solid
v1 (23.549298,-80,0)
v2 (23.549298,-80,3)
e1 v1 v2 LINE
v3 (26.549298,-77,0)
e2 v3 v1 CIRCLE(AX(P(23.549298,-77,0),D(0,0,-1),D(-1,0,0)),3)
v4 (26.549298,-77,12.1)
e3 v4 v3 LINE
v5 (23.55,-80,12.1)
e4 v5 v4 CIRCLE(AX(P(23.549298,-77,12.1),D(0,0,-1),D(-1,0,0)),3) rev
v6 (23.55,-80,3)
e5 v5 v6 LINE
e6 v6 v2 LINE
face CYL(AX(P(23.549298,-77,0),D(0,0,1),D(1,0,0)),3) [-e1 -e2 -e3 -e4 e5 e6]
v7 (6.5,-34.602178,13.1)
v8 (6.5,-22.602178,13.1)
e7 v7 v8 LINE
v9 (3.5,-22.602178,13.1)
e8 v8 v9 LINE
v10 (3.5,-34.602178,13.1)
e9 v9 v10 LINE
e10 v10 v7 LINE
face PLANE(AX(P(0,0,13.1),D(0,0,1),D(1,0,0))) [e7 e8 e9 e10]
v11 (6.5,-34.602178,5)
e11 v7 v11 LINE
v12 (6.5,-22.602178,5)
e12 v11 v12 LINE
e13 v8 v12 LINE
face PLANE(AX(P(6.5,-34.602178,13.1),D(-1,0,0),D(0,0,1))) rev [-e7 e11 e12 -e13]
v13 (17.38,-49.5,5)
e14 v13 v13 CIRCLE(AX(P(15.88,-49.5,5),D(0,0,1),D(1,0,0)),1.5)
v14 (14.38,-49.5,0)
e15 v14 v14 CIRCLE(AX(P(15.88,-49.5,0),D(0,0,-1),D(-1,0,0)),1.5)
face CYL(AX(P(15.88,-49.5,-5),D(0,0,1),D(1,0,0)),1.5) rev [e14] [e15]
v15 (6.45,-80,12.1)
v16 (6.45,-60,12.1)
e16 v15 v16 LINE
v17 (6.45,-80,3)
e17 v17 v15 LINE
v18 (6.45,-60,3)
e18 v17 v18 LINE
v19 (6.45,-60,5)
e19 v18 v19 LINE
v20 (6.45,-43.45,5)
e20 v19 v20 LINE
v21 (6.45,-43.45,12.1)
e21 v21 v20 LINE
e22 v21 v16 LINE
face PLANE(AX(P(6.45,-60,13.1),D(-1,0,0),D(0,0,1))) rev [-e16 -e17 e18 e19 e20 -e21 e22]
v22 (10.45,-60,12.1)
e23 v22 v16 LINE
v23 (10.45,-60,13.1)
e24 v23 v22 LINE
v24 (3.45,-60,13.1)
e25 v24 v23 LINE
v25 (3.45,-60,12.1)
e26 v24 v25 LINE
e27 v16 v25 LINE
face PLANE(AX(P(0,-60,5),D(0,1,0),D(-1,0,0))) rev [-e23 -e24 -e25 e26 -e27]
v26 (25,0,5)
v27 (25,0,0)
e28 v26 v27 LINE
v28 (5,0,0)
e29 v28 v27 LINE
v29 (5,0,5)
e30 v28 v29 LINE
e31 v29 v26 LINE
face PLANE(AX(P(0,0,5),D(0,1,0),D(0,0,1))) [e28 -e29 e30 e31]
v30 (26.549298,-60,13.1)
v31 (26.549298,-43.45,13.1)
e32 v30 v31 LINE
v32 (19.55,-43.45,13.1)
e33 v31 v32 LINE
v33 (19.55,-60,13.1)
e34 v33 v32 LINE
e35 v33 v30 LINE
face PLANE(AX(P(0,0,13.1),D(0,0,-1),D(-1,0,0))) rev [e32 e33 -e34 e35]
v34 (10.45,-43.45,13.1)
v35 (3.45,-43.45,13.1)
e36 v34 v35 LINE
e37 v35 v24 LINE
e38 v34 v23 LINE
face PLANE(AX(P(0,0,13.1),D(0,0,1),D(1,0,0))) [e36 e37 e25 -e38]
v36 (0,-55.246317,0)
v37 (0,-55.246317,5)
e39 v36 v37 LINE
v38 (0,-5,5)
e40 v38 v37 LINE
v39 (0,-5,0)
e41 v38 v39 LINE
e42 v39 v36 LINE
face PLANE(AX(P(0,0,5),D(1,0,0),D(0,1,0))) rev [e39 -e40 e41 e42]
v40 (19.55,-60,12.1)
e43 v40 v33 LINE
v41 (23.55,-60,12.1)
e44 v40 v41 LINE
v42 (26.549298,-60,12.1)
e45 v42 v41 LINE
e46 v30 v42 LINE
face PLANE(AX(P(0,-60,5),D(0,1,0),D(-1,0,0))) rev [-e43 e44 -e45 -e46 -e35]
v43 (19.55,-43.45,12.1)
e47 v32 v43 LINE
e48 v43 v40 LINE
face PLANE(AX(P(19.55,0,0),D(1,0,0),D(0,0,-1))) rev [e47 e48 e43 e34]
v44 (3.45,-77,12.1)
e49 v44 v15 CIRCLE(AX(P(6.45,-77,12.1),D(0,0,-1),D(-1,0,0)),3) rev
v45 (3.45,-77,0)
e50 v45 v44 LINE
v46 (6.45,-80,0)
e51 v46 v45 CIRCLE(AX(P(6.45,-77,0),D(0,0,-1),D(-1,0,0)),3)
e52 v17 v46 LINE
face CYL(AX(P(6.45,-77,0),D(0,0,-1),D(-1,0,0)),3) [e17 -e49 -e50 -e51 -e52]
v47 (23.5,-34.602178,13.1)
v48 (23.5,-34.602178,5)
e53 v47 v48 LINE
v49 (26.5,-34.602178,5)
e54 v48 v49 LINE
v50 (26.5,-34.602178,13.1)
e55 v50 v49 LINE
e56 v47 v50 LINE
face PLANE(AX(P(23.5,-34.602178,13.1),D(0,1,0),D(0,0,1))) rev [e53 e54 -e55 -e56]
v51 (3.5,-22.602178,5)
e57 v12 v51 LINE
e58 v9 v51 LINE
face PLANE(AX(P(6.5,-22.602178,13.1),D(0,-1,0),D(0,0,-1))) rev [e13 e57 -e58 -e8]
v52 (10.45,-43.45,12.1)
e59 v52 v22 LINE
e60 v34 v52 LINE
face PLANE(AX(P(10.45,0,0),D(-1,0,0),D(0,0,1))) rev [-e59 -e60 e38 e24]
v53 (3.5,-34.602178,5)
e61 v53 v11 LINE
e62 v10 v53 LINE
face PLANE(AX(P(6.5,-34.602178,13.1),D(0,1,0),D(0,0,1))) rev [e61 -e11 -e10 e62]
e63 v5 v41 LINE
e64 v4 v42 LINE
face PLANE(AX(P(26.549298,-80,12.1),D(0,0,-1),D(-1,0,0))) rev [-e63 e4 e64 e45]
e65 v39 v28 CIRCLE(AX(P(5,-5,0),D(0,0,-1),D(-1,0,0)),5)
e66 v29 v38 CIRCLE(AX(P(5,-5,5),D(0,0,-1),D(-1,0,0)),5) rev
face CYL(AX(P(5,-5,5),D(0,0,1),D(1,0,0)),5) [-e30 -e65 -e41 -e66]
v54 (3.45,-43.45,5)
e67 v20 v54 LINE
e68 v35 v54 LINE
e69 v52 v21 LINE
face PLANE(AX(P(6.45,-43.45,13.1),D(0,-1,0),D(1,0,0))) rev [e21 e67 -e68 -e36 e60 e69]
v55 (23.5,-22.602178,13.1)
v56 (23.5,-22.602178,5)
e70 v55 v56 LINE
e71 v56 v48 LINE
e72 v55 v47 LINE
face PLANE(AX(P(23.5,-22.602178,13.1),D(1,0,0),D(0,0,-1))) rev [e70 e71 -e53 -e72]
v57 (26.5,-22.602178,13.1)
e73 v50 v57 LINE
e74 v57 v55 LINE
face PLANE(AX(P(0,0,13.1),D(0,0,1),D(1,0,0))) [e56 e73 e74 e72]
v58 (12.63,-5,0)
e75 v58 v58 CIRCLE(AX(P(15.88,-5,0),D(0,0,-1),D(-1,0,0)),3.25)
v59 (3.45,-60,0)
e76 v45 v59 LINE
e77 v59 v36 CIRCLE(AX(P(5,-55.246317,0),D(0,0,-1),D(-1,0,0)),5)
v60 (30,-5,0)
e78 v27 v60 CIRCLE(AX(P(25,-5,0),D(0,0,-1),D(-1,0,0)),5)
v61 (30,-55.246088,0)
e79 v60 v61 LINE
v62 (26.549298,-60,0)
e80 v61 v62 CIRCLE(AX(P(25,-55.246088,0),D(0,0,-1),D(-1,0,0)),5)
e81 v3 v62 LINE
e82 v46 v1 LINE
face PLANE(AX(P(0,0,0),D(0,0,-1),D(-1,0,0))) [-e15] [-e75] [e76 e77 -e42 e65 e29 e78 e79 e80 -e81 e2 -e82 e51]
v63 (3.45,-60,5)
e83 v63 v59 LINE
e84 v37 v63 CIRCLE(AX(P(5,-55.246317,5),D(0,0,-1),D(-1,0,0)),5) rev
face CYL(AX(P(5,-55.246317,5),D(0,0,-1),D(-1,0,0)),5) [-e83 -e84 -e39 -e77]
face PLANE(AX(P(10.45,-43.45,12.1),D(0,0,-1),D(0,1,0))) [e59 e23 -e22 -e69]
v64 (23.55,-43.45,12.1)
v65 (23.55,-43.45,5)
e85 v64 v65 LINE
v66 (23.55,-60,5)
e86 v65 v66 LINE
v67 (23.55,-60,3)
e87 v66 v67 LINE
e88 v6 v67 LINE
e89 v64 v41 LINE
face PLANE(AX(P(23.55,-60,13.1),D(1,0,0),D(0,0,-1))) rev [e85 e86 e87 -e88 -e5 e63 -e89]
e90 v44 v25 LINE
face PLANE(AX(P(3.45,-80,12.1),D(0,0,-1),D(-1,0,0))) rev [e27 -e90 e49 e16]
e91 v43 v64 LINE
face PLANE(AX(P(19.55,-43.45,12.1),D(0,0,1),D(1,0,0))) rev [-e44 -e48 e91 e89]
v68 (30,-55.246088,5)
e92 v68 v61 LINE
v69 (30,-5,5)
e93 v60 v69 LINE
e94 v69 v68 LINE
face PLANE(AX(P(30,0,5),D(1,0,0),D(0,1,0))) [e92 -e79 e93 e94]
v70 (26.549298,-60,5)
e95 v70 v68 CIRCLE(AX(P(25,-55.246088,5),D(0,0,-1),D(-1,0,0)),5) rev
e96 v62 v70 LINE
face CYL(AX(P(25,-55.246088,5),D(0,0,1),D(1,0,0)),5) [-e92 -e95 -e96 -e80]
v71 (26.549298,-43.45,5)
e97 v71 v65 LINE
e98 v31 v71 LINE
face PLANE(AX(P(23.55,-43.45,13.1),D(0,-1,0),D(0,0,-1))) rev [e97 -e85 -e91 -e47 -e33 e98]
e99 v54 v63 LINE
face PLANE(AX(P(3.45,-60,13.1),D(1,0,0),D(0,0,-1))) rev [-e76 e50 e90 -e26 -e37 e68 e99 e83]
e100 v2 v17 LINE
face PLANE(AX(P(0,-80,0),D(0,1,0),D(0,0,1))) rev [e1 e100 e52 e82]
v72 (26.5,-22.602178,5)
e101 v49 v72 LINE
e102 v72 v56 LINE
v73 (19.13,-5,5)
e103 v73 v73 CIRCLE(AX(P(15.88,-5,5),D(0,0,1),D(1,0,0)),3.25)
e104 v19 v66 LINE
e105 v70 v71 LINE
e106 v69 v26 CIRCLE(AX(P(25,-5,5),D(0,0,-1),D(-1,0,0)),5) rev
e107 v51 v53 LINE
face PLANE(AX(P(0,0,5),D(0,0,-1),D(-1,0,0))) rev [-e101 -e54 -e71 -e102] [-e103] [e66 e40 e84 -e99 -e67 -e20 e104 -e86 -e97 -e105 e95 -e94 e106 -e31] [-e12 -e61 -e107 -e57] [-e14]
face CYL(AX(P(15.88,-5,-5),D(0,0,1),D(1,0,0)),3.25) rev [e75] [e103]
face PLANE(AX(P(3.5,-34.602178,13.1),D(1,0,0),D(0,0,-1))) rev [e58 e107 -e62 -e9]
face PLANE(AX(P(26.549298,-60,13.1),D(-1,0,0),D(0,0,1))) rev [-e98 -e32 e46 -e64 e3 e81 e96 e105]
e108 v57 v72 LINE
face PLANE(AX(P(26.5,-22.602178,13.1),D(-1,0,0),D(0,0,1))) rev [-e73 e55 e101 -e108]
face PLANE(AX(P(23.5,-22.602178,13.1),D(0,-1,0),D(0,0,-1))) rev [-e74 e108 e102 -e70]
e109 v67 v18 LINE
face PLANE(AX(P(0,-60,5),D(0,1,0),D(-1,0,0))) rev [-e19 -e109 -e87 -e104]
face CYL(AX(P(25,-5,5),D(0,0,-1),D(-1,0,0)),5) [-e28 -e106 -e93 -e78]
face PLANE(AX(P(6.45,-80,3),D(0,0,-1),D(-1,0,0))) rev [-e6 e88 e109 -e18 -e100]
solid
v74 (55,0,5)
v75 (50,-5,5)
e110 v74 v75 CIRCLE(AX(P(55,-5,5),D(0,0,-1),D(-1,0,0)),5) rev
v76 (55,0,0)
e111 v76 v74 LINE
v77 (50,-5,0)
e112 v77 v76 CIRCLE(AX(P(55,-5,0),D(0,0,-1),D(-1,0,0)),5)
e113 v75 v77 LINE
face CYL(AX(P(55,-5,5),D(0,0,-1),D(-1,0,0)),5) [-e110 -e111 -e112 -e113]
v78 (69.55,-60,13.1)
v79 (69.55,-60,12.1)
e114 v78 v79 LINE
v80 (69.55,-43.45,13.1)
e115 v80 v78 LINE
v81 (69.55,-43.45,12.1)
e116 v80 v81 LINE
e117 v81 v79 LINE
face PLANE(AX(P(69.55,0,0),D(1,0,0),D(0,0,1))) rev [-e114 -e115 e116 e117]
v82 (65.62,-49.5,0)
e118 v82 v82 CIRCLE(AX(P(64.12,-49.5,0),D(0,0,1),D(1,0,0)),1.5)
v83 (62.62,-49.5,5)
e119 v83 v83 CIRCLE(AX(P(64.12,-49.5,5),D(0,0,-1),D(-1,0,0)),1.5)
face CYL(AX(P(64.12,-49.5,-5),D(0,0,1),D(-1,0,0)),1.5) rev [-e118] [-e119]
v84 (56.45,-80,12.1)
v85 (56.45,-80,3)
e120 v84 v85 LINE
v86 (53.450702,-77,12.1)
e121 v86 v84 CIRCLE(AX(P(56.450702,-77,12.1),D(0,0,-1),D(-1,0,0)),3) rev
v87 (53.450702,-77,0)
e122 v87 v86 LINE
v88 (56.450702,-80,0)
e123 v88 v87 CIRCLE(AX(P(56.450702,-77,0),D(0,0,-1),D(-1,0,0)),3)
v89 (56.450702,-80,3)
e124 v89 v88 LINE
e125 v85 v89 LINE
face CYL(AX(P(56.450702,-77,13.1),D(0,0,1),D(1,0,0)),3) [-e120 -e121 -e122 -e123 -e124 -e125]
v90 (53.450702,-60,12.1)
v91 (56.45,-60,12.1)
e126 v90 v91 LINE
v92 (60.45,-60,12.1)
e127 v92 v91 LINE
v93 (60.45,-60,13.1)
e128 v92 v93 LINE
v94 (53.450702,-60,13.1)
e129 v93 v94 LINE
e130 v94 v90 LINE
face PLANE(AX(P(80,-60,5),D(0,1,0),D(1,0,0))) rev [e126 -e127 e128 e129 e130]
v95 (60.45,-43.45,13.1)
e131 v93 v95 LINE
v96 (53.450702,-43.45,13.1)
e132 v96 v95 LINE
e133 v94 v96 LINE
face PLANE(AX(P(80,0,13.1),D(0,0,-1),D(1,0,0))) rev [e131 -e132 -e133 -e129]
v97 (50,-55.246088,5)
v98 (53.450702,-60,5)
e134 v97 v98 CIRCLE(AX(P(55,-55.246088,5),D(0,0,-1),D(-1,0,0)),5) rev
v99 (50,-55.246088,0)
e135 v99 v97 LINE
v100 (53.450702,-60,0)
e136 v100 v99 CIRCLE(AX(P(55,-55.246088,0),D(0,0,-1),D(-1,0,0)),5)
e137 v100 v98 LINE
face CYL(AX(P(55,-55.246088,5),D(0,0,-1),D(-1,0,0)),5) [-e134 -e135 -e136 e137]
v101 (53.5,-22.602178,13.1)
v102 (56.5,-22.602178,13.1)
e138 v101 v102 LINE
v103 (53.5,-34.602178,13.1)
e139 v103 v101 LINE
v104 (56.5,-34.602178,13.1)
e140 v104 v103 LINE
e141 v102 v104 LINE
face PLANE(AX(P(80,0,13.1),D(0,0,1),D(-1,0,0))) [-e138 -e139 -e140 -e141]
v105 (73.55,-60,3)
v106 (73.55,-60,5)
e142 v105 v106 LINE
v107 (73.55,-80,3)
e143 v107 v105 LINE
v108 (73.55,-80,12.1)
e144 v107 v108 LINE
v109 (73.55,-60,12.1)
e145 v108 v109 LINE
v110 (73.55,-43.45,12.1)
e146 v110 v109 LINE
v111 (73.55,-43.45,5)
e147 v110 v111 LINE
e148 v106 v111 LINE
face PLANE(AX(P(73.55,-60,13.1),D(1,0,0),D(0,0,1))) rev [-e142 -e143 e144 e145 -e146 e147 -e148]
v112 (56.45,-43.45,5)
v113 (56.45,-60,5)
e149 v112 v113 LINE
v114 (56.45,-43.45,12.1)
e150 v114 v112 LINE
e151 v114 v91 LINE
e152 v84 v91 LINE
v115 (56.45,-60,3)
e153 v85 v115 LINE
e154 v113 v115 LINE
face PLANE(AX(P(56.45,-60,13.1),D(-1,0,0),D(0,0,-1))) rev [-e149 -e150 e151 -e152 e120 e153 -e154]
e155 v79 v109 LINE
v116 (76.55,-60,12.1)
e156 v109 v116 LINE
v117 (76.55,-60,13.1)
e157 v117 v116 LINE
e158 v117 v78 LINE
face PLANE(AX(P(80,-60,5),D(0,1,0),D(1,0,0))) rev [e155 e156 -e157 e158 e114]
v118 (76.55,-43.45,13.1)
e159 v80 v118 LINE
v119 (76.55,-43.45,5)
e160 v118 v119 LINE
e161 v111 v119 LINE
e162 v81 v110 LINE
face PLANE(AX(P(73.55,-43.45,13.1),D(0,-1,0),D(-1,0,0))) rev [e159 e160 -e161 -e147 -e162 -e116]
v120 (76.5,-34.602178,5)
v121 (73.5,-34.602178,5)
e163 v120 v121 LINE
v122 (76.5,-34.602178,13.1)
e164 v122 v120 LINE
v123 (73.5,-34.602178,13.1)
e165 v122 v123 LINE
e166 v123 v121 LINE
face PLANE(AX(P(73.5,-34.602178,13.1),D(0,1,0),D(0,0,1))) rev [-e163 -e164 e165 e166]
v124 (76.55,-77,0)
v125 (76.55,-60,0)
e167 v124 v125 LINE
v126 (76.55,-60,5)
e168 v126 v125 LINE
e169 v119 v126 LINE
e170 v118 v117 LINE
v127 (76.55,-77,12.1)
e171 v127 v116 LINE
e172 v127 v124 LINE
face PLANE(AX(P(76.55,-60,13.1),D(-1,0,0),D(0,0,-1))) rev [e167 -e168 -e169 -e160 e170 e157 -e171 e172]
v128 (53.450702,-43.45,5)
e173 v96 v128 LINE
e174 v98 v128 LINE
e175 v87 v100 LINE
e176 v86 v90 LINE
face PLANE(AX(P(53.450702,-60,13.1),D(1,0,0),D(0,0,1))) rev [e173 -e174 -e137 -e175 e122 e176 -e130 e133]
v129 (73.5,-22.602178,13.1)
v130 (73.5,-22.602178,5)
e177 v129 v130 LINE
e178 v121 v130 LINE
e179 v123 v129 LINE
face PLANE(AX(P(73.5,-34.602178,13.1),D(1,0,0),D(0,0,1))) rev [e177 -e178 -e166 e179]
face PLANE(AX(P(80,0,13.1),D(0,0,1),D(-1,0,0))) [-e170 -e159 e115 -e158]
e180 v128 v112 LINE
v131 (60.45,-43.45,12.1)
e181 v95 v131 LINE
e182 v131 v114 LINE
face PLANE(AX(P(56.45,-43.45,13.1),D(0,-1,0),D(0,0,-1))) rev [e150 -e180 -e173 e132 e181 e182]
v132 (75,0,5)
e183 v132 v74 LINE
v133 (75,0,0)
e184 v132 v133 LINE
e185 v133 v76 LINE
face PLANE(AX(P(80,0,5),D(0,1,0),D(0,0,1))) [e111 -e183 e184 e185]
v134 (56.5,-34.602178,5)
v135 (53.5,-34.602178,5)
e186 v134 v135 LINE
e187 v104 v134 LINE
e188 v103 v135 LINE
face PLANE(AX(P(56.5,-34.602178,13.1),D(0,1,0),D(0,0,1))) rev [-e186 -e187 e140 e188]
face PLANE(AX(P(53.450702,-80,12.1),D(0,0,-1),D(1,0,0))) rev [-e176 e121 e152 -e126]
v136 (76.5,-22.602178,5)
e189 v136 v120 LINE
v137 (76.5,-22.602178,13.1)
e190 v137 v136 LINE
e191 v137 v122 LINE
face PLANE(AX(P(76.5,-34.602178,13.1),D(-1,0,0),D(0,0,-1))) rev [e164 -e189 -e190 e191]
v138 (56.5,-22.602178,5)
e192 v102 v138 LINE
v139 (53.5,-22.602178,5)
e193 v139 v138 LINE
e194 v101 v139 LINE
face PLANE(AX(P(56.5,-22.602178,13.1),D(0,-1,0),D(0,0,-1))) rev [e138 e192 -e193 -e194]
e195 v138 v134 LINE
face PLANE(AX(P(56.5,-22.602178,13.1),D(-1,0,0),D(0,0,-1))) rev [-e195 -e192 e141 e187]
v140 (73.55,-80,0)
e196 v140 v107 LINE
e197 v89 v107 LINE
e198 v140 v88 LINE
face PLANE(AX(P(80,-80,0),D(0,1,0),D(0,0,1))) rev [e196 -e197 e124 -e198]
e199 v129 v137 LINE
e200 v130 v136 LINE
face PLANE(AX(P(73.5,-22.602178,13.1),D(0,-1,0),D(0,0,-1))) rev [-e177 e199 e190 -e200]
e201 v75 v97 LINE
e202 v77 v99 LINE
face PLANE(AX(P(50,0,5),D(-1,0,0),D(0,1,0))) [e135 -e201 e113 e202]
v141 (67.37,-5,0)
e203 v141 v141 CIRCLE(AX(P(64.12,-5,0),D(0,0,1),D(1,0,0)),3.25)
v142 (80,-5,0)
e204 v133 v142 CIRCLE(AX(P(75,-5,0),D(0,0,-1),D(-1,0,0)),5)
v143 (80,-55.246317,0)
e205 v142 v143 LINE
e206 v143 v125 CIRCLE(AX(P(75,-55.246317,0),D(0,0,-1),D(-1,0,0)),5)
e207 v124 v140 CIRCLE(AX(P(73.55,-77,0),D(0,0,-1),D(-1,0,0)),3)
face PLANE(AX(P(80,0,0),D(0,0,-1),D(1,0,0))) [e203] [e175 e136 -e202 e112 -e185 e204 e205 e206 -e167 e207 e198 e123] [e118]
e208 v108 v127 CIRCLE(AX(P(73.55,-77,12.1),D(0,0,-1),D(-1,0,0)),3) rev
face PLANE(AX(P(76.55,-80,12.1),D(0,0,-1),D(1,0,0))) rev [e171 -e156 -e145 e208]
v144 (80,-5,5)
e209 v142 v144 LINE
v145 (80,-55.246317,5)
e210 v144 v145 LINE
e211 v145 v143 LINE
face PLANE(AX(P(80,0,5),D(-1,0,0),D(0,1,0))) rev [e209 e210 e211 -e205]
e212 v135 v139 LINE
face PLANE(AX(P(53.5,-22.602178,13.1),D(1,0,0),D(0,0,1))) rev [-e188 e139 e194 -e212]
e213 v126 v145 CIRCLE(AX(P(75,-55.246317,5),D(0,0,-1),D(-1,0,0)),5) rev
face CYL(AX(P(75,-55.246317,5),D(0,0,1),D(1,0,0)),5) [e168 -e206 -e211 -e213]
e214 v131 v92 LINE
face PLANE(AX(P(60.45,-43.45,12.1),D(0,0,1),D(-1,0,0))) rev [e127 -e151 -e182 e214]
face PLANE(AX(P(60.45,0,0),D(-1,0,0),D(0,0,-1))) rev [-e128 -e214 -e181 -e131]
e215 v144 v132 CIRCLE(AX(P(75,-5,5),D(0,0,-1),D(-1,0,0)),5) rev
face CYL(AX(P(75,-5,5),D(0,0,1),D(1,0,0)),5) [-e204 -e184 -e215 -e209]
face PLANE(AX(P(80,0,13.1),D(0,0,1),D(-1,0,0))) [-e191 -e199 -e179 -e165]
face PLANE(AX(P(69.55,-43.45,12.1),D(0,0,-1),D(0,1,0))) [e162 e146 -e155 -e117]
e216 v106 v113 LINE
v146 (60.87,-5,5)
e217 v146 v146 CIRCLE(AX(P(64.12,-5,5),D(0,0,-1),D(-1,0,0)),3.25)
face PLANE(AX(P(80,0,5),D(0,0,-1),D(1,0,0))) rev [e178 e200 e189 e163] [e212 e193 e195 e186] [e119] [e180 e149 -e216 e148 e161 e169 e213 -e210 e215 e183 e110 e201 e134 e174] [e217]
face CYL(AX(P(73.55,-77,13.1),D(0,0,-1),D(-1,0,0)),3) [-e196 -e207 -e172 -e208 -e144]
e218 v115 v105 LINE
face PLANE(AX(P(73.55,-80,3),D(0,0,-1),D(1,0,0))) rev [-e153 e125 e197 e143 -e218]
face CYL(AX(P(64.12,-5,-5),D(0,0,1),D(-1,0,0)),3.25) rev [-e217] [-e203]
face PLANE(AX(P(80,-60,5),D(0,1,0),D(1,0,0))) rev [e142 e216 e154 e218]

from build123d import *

# Parameters (mm, degrees)
SKETCH_1_W          = 30
SKETCH_1_H          = 60
EXTRUDE_1_DEPTH     = 5
SKETCH_2_R          = 3.25
SKETCH_2_R_2        = 1.5
CUT_EXTRUDE_1_DEPTH = 10
SKETCH_3_W          = 3
SKETCH_3_H          = 16.55
SKETCH_3_W_2        = 2.999297591
SKETCH_3_H_2        = 12
EXTRUDE_2_DEPTH     = 8.1
SKETCH_4_W          = 1
SKETCH_4_H          = 16.55
EXTRUDE_3_DEPTH     = 4
SKETCH_5_W          = 1
SKETCH_5_H          = 16.55
EXTRUDE_4_DEPTH     = 4
EXTRUDE_5_DEPTH     = 20
FILLET_3_R          = 5
FILLET_5_R          = 3
FILLET_6_R          = 5
FILLET_7_R          = 3


with BuildPart() as part:
    # 스케치1 → 보스-돌출1 (new body)
    with BuildSketch(Plane.XY):
        with Locations((15, -30)):
            Rectangle(SKETCH_1_W, SKETCH_1_H)
    extrude(amount=EXTRUDE_1_DEPTH)

    # 스케치2 → 컷-돌출1 (cut)
    with BuildSketch(Plane.XY.offset(5)):
        with Locations((15.88, -5)):
            Circle(SKETCH_2_R)
        with Locations((15.88, -49.5)):
            Circle(SKETCH_2_R_2)
    extrude(amount=-CUT_EXTRUDE_1_DEPTH, mode=Mode.SUBTRACT)

    # 스케치3 → 보스-돌출2 (add)
    with BuildSketch(Plane.XY.offset(5)):
        with Locations((4.95, -51.725)):
            Rectangle(SKETCH_3_W, SKETCH_3_H)
        with Locations((25.049648796, -51.725)):
            Rectangle(SKETCH_3_W_2, SKETCH_3_H)
        with Locations((5, -28.602177849)):
            Rectangle(SKETCH_3_W, SKETCH_3_H_2)
        with Locations((25, -28.602177849)):
            Rectangle(SKETCH_3_W, SKETCH_3_H_2)
    extrude(amount=EXTRUDE_2_DEPTH)

    # 스케치4 → 보스-돌출3 (add)
    with BuildSketch(Plane(origin=(6.45, 0, 0), x_dir=(0, 0, -1), z_dir=(1, 0, 0))):
        with Locations((-12.6, -51.725)):
            Rectangle(SKETCH_4_W, SKETCH_4_H)
    extrude(amount=EXTRUDE_3_DEPTH)

    # 스케치5 → 보스-돌출4 (add)
    with BuildSketch(Plane.ZY.offset(-23.55)):
        with Locations((12.6, -51.725)):
            Rectangle(SKETCH_5_W, SKETCH_5_H)
    extrude(amount=EXTRUDE_4_DEPTH)

    # 스케치6 → 보스-돌출5 (add)
    with BuildSketch(Plane.XZ.offset(60)):
        Polygon((3.45, 0), (26.549297591, 0), (26.549297591, 3), (26.549297591, 12.1), (23.55, 12.1), (23.55, 3), (6.45, 3), (6.45, 12.1), (3.45, 12.1), (3.45, 3), align=None)
    extrude(amount=EXTRUDE_5_DEPTH)


with BuildPart() as body_2:
    # 대칭 복사8: mirrored copy
    add(part.part.mirror(Plane(origin=(40, 0, 0), x_dir=(0, 0, 1), z_dir=(1, 0, 0))))

    # 필렛6
    # the kernel refuses this fillet: 5 mm, written as the material it takes off along each edge
    with BuildSketch(Plane(origin=(50, -60, -11.884779388), x_dir=(0, 1, 0), z_dir=(0, 0, 1))) as fillet_6_piece_1:
        with BuildLine():
            CenterArc((4.753911755, -5), FILLET_6_R, 90, 71.949235391)
            Line((0, -3.450702409), (-0.095078235, -3.419716457))
            ThreePointArc((-0.095078235, -3.419716457), (-0.1, -1.725351205), (-0.1, 0))
            Line((-0.1, 0), (0, 0.1))
            Line((0, 0.1), (4.753911755, 0.1))
            Line((4.753911755, 0.1), (4.753911755, 0))
        make_face()
    extrude(amount=28.769558776, mode=Mode.SUBTRACT)
    with BuildSketch(Plane(origin=(80, -60, -11.884206957), x_dir=(0, 1, 0), z_dir=(0, 0, 1))) as fillet_6_piece_2:
        with BuildLine():
            CenterArc((4.753682783, 5), FILLET_6_R, 198.059230491, 71.940769509)
            Line((0, 3.45), (-0.095073656, 3.419))
            ThreePointArc((-0.095073656, 3.419), (-0.1, 1.725), (-0.1, 0))
            Line((-0.1, 0), (0, -0.1))
            Line((0, -0.1), (4.753682783, -0.1))
            Line((4.753682783, -0.1), (4.753682783, 0))
        make_face()
    extrude(amount=28.768413914, mode=Mode.SUBTRACT)
    with BuildSketch(Plane(origin=(50, 0, -12.5), x_dir=(1, 0, 0), z_dir=(0, 0, 1))) as fillet_6_piece_3:
        with BuildLine():
            CenterArc((FILLET_6_R, -FILLET_6_R), FILLET_6_R, 90, 90)
            Line((0, -FILLET_6_R), (-FILLET_6_R * 0.02, -FILLET_6_R))
            Line((-FILLET_6_R * 0.02, -FILLET_6_R), (-FILLET_6_R * 0.02, FILLET_6_R * 0.02))
            Line((-FILLET_6_R * 0.02, FILLET_6_R * 0.02), (FILLET_6_R, FILLET_6_R * 0.02))
            Line((FILLET_6_R, FILLET_6_R * 0.02), (FILLET_6_R, 0))
        make_face()
    extrude(amount=30, mode=Mode.SUBTRACT)
    with BuildSketch(Plane(origin=(80, 0, -12.5), x_dir=(-1, 0, 0), z_dir=(0, 0, 1))) as fillet_6_piece_4:
        with BuildLine():
            CenterArc((FILLET_6_R, FILLET_6_R), FILLET_6_R, 180, 90)
            Line((0, FILLET_6_R), (-FILLET_6_R * 0.02, FILLET_6_R))
            Line((-FILLET_6_R * 0.02, FILLET_6_R), (-FILLET_6_R * 0.02, -FILLET_6_R * 0.02))
            Line((-FILLET_6_R * 0.02, -FILLET_6_R * 0.02), (FILLET_6_R, -FILLET_6_R * 0.02))
            Line((FILLET_6_R, -FILLET_6_R * 0.02), (FILLET_6_R, 0))
        make_face()
    extrude(amount=30, mode=Mode.SUBTRACT)

    # 필렛7
    fillet_7_edges = [body_2.edges().sort_by_distance(p)[0] for p in [
        (53.450702409, -80, 6.05),
        (76.55, -80, 6.05),
    ]]
    fillet(fillet_7_edges, radius=FILLET_7_R)


with BuildPart() as part_1:
    add(part.part)

    # 필렛3
    # the kernel refuses this fillet: 5 mm, written as the material it takes off along each edge
    with BuildSketch(Plane(origin=(30, -60, -11.884779388), x_dir=(0, 1, 0), z_dir=(0, 0, 1))) as fillet_3_piece_1:
        with BuildLine():
            CenterArc((4.753911755, 5), FILLET_3_R, 198.050764609, 71.949235391)
            Line((0, 3.450702409), (-0.095078235, 3.419716457))
            ThreePointArc((-0.095078235, 3.419716457), (-0.1, 1.725351205), (-0.1, 0))
            Line((-0.1, 0), (0, -0.1))
            Line((0, -0.1), (4.753911755, -0.1))
            Line((4.753911755, -0.1), (4.753911755, 0))
        make_face()
    extrude(amount=28.769558776, mode=Mode.SUBTRACT)
    with BuildSketch(Plane(origin=(0, -60, -11.884206957), x_dir=(0, 1, 0), z_dir=(0, 0, 1))) as fillet_3_piece_2:
        with BuildLine():
            CenterArc((4.753682783, -5), FILLET_3_R, 90, 71.940769509)
            Line((0, -3.45), (-0.095073656, -3.419))
            ThreePointArc((-0.095073656, -3.419), (-0.1, -1.725), (-0.1, 0))
            Line((-0.1, 0), (0, 0.1))
            Line((0, 0.1), (4.753682783, 0.1))
            Line((4.753682783, 0.1), (4.753682783, 0))
        make_face()
    extrude(amount=28.768413914, mode=Mode.SUBTRACT)
    with BuildSketch(Plane(origin=(30, 0, -12.5), x_dir=(-1, 0, 0), z_dir=(0, 0, 1))) as fillet_3_piece_3:
        with BuildLine():
            CenterArc((FILLET_3_R, FILLET_3_R), FILLET_3_R, 180, 90)
            Line((0, FILLET_3_R), (-FILLET_3_R * 0.02, FILLET_3_R))
            Line((-FILLET_3_R * 0.02, FILLET_3_R), (-FILLET_3_R * 0.02, -FILLET_3_R * 0.02))
            Line((-FILLET_3_R * 0.02, -FILLET_3_R * 0.02), (FILLET_3_R, -FILLET_3_R * 0.02))
            Line((FILLET_3_R, -FILLET_3_R * 0.02), (FILLET_3_R, 0))
        make_face()
    extrude(amount=30, mode=Mode.SUBTRACT)
    with BuildSketch(Plane(origin=(0, 0, -12.5), x_dir=(1, 0, 0), z_dir=(0, 0, 1))) as fillet_3_piece_4:
        with BuildLine():
            CenterArc((FILLET_3_R, -FILLET_3_R), FILLET_3_R, 90, 90)
            Line((0, -FILLET_3_R), (-FILLET_3_R * 0.02, -FILLET_3_R))
            Line((-FILLET_3_R * 0.02, -FILLET_3_R), (-FILLET_3_R * 0.02, FILLET_3_R * 0.02))
            Line((-FILLET_3_R * 0.02, FILLET_3_R * 0.02), (FILLET_3_R, FILLET_3_R * 0.02))
            Line((FILLET_3_R, FILLET_3_R * 0.02), (FILLET_3_R, 0))
        make_face()
    extrude(amount=30, mode=Mode.SUBTRACT)

    # 필렛5
    fillet_5_edges = [part_1.edges().sort_by_distance(p)[0] for p in [
        (3.45, -80, 6.05),
        (26.549297591, -80, 6.05),
    ]]
    fillet(fillet_5_edges, radius=FILLET_5_R)


solid = Compound([body_2.part, part_1.part])
